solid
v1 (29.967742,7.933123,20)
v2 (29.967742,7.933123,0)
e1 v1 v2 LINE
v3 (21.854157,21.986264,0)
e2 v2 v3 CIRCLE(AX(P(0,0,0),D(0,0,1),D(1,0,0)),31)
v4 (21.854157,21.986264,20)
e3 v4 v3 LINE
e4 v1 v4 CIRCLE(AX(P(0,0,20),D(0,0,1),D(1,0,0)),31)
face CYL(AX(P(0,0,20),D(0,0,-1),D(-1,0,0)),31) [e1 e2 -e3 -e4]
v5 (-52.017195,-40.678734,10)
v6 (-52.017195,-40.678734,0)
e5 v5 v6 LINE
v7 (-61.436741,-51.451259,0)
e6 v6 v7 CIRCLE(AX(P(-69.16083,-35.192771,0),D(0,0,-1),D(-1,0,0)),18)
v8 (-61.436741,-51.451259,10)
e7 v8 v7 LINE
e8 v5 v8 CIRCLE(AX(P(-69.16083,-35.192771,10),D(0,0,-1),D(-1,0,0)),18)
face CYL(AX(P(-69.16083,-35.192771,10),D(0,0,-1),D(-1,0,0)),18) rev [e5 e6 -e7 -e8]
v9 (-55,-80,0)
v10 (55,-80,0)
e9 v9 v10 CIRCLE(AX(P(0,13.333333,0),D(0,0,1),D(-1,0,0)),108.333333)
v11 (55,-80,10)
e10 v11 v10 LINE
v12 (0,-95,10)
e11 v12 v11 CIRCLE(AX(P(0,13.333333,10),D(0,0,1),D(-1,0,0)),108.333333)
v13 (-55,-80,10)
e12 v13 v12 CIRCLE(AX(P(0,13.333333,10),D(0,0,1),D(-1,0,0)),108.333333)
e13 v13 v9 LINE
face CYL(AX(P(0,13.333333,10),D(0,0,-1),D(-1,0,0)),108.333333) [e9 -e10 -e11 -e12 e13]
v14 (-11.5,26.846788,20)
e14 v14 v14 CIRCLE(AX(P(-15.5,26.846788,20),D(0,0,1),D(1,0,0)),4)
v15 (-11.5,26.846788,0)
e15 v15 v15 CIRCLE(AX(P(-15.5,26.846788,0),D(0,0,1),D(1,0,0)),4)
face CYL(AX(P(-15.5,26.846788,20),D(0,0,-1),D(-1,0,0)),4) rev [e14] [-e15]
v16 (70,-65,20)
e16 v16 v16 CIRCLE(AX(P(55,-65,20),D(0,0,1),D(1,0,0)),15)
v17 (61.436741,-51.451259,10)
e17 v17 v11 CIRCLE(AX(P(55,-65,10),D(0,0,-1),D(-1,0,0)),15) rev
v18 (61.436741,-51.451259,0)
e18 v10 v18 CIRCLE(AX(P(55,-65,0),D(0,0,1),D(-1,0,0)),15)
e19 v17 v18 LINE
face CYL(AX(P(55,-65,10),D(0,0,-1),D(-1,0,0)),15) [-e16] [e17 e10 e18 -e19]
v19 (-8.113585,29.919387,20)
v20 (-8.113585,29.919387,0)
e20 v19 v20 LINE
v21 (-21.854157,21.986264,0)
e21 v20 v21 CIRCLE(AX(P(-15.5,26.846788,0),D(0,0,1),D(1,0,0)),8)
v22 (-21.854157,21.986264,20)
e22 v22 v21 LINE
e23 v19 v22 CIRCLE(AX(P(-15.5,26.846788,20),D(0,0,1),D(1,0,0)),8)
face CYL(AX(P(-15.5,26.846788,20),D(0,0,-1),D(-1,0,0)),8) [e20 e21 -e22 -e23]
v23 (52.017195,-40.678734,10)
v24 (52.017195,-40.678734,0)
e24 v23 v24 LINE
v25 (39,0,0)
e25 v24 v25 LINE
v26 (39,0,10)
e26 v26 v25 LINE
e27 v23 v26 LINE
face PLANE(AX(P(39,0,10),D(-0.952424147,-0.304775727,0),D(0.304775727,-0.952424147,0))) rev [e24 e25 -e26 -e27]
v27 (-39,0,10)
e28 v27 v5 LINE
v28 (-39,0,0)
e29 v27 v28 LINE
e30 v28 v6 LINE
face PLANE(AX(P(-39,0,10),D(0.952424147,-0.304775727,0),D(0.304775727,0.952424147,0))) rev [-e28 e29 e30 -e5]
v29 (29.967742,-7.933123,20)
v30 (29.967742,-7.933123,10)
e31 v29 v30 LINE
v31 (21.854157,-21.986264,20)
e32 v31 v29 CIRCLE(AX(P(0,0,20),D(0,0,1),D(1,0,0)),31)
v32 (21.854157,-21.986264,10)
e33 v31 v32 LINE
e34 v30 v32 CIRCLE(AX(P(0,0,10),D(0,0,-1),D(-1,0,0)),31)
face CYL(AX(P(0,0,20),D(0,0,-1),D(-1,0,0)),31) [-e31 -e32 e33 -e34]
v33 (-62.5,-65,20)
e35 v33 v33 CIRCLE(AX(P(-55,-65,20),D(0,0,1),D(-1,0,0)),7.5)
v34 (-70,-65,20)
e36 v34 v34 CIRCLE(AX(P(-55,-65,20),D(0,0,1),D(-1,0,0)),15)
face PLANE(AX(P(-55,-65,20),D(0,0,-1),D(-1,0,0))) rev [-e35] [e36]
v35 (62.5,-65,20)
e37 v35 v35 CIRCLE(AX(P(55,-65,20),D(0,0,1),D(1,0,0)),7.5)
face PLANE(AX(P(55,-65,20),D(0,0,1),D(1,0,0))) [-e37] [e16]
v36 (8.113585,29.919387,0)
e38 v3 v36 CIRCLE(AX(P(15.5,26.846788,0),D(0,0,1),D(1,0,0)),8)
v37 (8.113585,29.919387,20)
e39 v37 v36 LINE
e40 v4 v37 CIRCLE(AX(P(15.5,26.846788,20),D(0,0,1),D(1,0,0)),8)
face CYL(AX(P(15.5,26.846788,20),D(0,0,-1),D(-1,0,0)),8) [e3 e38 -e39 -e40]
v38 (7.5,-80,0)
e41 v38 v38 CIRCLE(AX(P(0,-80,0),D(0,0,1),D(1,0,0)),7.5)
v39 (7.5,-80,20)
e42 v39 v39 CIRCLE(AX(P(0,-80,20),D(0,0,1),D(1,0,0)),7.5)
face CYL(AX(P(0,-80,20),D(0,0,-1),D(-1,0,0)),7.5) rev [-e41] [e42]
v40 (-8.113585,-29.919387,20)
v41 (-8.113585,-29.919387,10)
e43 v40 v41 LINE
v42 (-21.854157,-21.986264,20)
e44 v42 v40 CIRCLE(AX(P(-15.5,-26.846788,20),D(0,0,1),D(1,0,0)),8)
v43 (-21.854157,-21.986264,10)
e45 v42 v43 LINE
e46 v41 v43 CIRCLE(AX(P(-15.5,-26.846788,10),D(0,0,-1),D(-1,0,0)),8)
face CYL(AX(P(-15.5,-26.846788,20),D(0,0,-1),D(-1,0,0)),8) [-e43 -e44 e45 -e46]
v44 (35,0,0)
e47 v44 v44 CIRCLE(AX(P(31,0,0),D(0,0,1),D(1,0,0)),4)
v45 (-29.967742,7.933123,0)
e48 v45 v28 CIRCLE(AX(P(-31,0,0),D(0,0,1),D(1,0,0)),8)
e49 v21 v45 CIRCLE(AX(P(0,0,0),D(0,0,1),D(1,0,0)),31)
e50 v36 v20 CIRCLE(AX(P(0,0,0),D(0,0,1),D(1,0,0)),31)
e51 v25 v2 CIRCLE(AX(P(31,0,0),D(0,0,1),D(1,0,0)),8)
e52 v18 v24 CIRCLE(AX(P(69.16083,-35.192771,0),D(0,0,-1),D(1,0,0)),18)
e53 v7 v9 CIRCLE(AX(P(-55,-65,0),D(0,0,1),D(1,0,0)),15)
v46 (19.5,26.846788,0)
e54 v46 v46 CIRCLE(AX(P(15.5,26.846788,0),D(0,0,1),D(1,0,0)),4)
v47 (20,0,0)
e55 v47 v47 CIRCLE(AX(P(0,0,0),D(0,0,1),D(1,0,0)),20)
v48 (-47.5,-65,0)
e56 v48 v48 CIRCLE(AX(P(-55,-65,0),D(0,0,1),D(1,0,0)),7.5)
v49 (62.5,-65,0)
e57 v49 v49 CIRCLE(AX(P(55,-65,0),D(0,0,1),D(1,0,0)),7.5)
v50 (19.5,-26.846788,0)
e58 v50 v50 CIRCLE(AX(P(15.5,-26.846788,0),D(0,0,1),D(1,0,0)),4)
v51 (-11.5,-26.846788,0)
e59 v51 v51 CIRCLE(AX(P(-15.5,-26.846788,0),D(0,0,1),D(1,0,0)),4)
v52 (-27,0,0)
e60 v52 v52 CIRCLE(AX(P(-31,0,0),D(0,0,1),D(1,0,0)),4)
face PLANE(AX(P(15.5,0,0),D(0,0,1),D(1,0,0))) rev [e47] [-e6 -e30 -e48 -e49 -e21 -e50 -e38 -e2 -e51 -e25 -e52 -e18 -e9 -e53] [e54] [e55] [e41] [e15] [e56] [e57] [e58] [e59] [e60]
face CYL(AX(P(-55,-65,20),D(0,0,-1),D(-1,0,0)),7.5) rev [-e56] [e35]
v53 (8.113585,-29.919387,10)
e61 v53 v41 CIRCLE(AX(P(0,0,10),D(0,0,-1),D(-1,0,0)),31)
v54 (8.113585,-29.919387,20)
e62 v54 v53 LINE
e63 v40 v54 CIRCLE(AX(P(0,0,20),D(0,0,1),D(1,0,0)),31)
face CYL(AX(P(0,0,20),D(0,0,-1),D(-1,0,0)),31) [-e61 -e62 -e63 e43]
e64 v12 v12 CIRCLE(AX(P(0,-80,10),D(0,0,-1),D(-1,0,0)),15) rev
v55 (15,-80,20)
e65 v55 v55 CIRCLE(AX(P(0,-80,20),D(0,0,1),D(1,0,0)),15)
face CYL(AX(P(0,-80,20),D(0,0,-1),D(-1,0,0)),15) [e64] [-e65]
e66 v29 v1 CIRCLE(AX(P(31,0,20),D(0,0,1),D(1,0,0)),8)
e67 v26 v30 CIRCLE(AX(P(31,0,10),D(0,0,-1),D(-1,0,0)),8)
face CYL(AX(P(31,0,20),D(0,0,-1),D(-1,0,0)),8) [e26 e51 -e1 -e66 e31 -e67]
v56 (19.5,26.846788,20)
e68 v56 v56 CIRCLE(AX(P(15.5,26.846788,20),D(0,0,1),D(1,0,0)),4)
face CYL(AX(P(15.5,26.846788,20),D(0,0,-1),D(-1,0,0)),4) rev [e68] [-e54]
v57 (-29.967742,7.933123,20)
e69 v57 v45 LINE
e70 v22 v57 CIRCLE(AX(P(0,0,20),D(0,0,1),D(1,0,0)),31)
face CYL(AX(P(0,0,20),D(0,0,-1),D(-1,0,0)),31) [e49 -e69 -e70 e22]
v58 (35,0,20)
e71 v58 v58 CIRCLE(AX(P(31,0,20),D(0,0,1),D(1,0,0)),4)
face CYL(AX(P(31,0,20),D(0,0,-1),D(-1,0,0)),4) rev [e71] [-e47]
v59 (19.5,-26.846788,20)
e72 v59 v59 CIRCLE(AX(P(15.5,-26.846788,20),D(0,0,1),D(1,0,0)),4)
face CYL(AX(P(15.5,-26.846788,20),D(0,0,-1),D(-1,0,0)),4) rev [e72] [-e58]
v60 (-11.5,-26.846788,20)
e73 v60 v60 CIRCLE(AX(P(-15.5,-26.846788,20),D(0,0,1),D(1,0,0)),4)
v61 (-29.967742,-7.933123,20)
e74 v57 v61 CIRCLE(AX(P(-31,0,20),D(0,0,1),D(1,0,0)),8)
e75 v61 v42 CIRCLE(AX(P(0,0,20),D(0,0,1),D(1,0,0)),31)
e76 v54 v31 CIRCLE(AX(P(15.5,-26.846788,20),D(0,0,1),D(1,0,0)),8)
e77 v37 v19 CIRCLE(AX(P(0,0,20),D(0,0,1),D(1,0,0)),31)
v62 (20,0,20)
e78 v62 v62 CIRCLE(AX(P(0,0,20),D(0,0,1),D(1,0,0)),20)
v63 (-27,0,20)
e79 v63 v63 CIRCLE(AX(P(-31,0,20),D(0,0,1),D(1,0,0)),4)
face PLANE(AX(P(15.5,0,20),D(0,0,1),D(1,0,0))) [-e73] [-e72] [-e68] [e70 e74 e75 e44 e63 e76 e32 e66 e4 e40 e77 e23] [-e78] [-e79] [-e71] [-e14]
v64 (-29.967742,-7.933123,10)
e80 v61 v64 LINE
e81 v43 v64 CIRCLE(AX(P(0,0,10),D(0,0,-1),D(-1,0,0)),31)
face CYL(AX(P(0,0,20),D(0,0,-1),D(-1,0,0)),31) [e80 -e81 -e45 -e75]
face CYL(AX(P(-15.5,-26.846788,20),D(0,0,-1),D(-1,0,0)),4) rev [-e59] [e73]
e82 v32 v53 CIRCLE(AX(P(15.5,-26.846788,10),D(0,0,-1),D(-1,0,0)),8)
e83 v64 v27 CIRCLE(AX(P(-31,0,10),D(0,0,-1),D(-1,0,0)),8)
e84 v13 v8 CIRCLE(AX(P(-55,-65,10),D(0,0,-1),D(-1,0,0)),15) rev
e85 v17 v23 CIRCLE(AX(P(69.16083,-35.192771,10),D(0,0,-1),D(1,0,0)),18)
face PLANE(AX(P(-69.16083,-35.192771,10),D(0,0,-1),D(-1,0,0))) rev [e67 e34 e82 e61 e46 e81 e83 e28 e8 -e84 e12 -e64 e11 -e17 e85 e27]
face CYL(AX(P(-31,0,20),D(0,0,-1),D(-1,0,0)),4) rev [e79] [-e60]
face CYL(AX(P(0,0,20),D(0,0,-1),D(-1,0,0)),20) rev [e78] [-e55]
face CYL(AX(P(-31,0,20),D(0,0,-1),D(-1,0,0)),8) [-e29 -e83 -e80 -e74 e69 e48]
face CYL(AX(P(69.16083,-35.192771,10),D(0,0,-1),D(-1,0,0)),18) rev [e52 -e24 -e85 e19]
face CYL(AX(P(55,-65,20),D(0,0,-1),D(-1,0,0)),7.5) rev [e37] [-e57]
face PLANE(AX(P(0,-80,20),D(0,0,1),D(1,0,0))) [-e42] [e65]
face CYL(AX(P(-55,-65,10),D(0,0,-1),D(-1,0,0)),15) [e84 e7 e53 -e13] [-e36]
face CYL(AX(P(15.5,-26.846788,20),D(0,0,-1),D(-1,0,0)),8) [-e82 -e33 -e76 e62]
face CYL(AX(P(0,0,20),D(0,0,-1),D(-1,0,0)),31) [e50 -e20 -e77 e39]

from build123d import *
from build123d.topology import SkipClean

# Parameters (mm, degrees)
CROQUIS1_R                = 15
CROQUIS1_R_2              = 7.5
SALIENTE_EXTRUIR1_DEPTH   = 20
SALIENTE_EXTRUIR1_2_DEPTH = 20
SALIENTE_EXTRUIR1_3_DEPTH = 20
CROQUIS1_R_3              = 20
CROQUIS1_R_4              = 4
SALIENTE_EXTRUIR1_4_DEPTH = 20
SALIENTE_EXTRUIR2_DEPTH   = 10
CORTAR_EXTRUIR2_START     = -10
CORTAR_EXTRUIR2_DEPTH     = 10
CORTAR_EXTRUIR3_START     = -10
CROQUIS6_R                = 7.5
CROQUIS6_R_2              = 4
CORTAR_EXTRUIR3_DEPTH     = 10


with BuildPart() as part:
    # Croquis1 → Saliente-Extruir1 (new body)
    with BuildSketch(Plane.XY):
        with Locations((0, -80)):
            Circle(CROQUIS1_R)
        with Locations((0, -80)):
            Circle(CROQUIS1_R_2, mode=Mode.SUBTRACT)
    extrude(amount=SALIENTE_EXTRUIR1_DEPTH)



with BuildPart() as body_2:
    # Croquis1 → Saliente-Extruir1 2 (new body)
    with BuildSketch(Plane.XY):
        with Locations((55, -65)):
            Circle(CROQUIS1_R)
        with Locations((55, -65)):
            Circle(CROQUIS1_R_2, mode=Mode.SUBTRACT)
    extrude(amount=SALIENTE_EXTRUIR1_2_DEPTH)


with BuildPart() as body_3:
    # Croquis1 → Saliente-Extruir1 3 (new body)
    with BuildSketch(Plane.XY):
        with Locations((-55, -65)):
            Circle(CROQUIS1_R)
        with Locations((-55, -65)):
            Circle(CROQUIS1_R_2, mode=Mode.SUBTRACT)
    extrude(amount=SALIENTE_EXTRUIR1_3_DEPTH)


with BuildPart() as body_4:
    # Croquis1 → Saliente-Extruir1 4 (new body)
    with BuildSketch(Plane.XY):
        with BuildLine():
            ThreePointArc((29.967741935, -7.933123174), (39, 0), (29.967741935, 7.933123174))
            ThreePointArc((29.967741935, 7.933123174), (26.846787517, 15.5), (21.854157167, 21.986264223))
            ThreePointArc((21.854157167, 21.986264223), (19.5, 33.774990748), (8.113584768, 29.919387397))
            ThreePointArc((8.113584768, 29.919387397), (0, 31), (-8.113584768, 29.919387397))
            ThreePointArc((-8.113584768, 29.919387397), (-19.5, 33.774990748), (-21.854157167, 21.986264223))
            ThreePointArc((-21.854157167, 21.986264223), (-26.846787517, 15.5), (-29.967741935, 7.933123174))
            ThreePointArc((-29.967741935, 7.933123174), (-39, 0), (-29.967741935, -7.933123174))
            ThreePointArc((-29.967741935, -7.933123174), (-26.846787517, -15.5), (-21.854157167, -21.986264223))
            ThreePointArc((-21.854157167, -21.986264223), (-19.5, -33.774990748), (-8.113584768, -29.919387397))
            ThreePointArc((-8.113584768, -29.919387397), (0, -31), (8.113584768, -29.919387397))
            ThreePointArc((8.113584768, -29.919387397), (19.5, -33.774990748), (21.854157167, -21.986264223))
            ThreePointArc((21.854157167, -21.986264223), (26.846787517, -15.5), (29.967741935, -7.933123174))
        make_face()
        Circle(CROQUIS1_R_3, mode=Mode.SUBTRACT)
        with Locations((31, 0)):
            Circle(CROQUIS1_R_4, mode=Mode.SUBTRACT)
        with Locations((15.5, -26.846787517)):
            Circle(CROQUIS1_R_4, mode=Mode.SUBTRACT)
        with Locations((-15.5, -26.846787517)):
            Circle(CROQUIS1_R_4, mode=Mode.SUBTRACT)
        with Locations((-31, 0)):
            Circle(CROQUIS1_R_4, mode=Mode.SUBTRACT)
        with Locations((-15.5, 26.846787517)):
            Circle(CROQUIS1_R_4, mode=Mode.SUBTRACT)
        with Locations((15.5, 26.846787517)):
            Circle(CROQUIS1_R_4, mode=Mode.SUBTRACT)
    extrude(amount=SALIENTE_EXTRUIR1_4_DEPTH)


with BuildPart() as part_1:
    with SkipClean():  # the faces are left unmerged after this step: merging them gives an invalid solid
        add(part.part)

        add(body_2.part)  # Saliente-Extruir2 merges body 2

        add(body_3.part)  # Saliente-Extruir2 merges body 3

        add(body_4.part)  # Saliente-Extruir2 merges body 4
        # Croquis2 → Saliente-Extruir2 (add)
        with BuildSketch(Plane.XY):
            with BuildLine():
                Line((39, 0), (52.017194873, -40.678733978))
                ThreePointArc((52.017194873, -40.678733978), (55.61045151, -47.041283696), (61.436740692, -51.451259495))
                ThreePointArc((61.436740692, -51.451259495), (69.632687852, -68.29915841), (55, -80))
                ThreePointArc((55, -80), (0, -95), (-55, -80))
                ThreePointArc((-55, -80), (-69.632687852, -68.29915841), (-61.436740692, -51.451259495))
                ThreePointArc((-61.436740692, -51.451259495), (-55.61045151, -47.041283696), (-52.017194873, -40.678733978))
                Line((-52.017194873, -40.678733978), (-39, 0))
                Line((-39, 0), (39, 0))
            make_face()
        extrude(amount=SALIENTE_EXTRUIR2_DEPTH)

    # Croquis5 → Cortar-Extruir2 (cut)
    with SkipClean():  # the faces are left unmerged after this step: merging them gives an invalid solid
        with BuildSketch(Plane.XY.offset(10).offset(CORTAR_EXTRUIR2_START)):
            with BuildLine():
                Line((-20, 0), (20, 0))
                ThreePointArc((20, 0), (0, -20), (-20, 0))
            make_face()
        extrude(amount=CORTAR_EXTRUIR2_DEPTH, mode=Mode.SUBTRACT)

    # Croquis6 → Cortar-Extruir3 (cut)
    with SkipClean():  # the faces are left unmerged after this step: merging them gives an invalid solid
        with BuildSketch(Plane.XY.offset(10).offset(CORTAR_EXTRUIR3_START)):
            with Locations((-55, -65)):
                Circle(CROQUIS6_R)
            with Locations((0, -80)):
                Circle(CROQUIS6_R)
            with Locations((55, -65)):
                Circle(CROQUIS6_R)
            with Locations((15.5, -26.846787517)):
                Circle(CROQUIS6_R_2)
            with Locations((-15.5, -26.846787517)):
                Circle(CROQUIS6_R_2)
            with BuildLine():
                Line((-35, 0), (-27, 0))
                ThreePointArc((-27, 0), (-31, -4), (-35, 0))
            make_face()
            with BuildLine():
                Line((27, 0), (35, 0))
                ThreePointArc((35, 0), (31, -4), (27, 0))
            make_face()
        extrude(amount=CORTAR_EXTRUIR3_DEPTH, mode=Mode.SUBTRACT)


solid = part_1.part
